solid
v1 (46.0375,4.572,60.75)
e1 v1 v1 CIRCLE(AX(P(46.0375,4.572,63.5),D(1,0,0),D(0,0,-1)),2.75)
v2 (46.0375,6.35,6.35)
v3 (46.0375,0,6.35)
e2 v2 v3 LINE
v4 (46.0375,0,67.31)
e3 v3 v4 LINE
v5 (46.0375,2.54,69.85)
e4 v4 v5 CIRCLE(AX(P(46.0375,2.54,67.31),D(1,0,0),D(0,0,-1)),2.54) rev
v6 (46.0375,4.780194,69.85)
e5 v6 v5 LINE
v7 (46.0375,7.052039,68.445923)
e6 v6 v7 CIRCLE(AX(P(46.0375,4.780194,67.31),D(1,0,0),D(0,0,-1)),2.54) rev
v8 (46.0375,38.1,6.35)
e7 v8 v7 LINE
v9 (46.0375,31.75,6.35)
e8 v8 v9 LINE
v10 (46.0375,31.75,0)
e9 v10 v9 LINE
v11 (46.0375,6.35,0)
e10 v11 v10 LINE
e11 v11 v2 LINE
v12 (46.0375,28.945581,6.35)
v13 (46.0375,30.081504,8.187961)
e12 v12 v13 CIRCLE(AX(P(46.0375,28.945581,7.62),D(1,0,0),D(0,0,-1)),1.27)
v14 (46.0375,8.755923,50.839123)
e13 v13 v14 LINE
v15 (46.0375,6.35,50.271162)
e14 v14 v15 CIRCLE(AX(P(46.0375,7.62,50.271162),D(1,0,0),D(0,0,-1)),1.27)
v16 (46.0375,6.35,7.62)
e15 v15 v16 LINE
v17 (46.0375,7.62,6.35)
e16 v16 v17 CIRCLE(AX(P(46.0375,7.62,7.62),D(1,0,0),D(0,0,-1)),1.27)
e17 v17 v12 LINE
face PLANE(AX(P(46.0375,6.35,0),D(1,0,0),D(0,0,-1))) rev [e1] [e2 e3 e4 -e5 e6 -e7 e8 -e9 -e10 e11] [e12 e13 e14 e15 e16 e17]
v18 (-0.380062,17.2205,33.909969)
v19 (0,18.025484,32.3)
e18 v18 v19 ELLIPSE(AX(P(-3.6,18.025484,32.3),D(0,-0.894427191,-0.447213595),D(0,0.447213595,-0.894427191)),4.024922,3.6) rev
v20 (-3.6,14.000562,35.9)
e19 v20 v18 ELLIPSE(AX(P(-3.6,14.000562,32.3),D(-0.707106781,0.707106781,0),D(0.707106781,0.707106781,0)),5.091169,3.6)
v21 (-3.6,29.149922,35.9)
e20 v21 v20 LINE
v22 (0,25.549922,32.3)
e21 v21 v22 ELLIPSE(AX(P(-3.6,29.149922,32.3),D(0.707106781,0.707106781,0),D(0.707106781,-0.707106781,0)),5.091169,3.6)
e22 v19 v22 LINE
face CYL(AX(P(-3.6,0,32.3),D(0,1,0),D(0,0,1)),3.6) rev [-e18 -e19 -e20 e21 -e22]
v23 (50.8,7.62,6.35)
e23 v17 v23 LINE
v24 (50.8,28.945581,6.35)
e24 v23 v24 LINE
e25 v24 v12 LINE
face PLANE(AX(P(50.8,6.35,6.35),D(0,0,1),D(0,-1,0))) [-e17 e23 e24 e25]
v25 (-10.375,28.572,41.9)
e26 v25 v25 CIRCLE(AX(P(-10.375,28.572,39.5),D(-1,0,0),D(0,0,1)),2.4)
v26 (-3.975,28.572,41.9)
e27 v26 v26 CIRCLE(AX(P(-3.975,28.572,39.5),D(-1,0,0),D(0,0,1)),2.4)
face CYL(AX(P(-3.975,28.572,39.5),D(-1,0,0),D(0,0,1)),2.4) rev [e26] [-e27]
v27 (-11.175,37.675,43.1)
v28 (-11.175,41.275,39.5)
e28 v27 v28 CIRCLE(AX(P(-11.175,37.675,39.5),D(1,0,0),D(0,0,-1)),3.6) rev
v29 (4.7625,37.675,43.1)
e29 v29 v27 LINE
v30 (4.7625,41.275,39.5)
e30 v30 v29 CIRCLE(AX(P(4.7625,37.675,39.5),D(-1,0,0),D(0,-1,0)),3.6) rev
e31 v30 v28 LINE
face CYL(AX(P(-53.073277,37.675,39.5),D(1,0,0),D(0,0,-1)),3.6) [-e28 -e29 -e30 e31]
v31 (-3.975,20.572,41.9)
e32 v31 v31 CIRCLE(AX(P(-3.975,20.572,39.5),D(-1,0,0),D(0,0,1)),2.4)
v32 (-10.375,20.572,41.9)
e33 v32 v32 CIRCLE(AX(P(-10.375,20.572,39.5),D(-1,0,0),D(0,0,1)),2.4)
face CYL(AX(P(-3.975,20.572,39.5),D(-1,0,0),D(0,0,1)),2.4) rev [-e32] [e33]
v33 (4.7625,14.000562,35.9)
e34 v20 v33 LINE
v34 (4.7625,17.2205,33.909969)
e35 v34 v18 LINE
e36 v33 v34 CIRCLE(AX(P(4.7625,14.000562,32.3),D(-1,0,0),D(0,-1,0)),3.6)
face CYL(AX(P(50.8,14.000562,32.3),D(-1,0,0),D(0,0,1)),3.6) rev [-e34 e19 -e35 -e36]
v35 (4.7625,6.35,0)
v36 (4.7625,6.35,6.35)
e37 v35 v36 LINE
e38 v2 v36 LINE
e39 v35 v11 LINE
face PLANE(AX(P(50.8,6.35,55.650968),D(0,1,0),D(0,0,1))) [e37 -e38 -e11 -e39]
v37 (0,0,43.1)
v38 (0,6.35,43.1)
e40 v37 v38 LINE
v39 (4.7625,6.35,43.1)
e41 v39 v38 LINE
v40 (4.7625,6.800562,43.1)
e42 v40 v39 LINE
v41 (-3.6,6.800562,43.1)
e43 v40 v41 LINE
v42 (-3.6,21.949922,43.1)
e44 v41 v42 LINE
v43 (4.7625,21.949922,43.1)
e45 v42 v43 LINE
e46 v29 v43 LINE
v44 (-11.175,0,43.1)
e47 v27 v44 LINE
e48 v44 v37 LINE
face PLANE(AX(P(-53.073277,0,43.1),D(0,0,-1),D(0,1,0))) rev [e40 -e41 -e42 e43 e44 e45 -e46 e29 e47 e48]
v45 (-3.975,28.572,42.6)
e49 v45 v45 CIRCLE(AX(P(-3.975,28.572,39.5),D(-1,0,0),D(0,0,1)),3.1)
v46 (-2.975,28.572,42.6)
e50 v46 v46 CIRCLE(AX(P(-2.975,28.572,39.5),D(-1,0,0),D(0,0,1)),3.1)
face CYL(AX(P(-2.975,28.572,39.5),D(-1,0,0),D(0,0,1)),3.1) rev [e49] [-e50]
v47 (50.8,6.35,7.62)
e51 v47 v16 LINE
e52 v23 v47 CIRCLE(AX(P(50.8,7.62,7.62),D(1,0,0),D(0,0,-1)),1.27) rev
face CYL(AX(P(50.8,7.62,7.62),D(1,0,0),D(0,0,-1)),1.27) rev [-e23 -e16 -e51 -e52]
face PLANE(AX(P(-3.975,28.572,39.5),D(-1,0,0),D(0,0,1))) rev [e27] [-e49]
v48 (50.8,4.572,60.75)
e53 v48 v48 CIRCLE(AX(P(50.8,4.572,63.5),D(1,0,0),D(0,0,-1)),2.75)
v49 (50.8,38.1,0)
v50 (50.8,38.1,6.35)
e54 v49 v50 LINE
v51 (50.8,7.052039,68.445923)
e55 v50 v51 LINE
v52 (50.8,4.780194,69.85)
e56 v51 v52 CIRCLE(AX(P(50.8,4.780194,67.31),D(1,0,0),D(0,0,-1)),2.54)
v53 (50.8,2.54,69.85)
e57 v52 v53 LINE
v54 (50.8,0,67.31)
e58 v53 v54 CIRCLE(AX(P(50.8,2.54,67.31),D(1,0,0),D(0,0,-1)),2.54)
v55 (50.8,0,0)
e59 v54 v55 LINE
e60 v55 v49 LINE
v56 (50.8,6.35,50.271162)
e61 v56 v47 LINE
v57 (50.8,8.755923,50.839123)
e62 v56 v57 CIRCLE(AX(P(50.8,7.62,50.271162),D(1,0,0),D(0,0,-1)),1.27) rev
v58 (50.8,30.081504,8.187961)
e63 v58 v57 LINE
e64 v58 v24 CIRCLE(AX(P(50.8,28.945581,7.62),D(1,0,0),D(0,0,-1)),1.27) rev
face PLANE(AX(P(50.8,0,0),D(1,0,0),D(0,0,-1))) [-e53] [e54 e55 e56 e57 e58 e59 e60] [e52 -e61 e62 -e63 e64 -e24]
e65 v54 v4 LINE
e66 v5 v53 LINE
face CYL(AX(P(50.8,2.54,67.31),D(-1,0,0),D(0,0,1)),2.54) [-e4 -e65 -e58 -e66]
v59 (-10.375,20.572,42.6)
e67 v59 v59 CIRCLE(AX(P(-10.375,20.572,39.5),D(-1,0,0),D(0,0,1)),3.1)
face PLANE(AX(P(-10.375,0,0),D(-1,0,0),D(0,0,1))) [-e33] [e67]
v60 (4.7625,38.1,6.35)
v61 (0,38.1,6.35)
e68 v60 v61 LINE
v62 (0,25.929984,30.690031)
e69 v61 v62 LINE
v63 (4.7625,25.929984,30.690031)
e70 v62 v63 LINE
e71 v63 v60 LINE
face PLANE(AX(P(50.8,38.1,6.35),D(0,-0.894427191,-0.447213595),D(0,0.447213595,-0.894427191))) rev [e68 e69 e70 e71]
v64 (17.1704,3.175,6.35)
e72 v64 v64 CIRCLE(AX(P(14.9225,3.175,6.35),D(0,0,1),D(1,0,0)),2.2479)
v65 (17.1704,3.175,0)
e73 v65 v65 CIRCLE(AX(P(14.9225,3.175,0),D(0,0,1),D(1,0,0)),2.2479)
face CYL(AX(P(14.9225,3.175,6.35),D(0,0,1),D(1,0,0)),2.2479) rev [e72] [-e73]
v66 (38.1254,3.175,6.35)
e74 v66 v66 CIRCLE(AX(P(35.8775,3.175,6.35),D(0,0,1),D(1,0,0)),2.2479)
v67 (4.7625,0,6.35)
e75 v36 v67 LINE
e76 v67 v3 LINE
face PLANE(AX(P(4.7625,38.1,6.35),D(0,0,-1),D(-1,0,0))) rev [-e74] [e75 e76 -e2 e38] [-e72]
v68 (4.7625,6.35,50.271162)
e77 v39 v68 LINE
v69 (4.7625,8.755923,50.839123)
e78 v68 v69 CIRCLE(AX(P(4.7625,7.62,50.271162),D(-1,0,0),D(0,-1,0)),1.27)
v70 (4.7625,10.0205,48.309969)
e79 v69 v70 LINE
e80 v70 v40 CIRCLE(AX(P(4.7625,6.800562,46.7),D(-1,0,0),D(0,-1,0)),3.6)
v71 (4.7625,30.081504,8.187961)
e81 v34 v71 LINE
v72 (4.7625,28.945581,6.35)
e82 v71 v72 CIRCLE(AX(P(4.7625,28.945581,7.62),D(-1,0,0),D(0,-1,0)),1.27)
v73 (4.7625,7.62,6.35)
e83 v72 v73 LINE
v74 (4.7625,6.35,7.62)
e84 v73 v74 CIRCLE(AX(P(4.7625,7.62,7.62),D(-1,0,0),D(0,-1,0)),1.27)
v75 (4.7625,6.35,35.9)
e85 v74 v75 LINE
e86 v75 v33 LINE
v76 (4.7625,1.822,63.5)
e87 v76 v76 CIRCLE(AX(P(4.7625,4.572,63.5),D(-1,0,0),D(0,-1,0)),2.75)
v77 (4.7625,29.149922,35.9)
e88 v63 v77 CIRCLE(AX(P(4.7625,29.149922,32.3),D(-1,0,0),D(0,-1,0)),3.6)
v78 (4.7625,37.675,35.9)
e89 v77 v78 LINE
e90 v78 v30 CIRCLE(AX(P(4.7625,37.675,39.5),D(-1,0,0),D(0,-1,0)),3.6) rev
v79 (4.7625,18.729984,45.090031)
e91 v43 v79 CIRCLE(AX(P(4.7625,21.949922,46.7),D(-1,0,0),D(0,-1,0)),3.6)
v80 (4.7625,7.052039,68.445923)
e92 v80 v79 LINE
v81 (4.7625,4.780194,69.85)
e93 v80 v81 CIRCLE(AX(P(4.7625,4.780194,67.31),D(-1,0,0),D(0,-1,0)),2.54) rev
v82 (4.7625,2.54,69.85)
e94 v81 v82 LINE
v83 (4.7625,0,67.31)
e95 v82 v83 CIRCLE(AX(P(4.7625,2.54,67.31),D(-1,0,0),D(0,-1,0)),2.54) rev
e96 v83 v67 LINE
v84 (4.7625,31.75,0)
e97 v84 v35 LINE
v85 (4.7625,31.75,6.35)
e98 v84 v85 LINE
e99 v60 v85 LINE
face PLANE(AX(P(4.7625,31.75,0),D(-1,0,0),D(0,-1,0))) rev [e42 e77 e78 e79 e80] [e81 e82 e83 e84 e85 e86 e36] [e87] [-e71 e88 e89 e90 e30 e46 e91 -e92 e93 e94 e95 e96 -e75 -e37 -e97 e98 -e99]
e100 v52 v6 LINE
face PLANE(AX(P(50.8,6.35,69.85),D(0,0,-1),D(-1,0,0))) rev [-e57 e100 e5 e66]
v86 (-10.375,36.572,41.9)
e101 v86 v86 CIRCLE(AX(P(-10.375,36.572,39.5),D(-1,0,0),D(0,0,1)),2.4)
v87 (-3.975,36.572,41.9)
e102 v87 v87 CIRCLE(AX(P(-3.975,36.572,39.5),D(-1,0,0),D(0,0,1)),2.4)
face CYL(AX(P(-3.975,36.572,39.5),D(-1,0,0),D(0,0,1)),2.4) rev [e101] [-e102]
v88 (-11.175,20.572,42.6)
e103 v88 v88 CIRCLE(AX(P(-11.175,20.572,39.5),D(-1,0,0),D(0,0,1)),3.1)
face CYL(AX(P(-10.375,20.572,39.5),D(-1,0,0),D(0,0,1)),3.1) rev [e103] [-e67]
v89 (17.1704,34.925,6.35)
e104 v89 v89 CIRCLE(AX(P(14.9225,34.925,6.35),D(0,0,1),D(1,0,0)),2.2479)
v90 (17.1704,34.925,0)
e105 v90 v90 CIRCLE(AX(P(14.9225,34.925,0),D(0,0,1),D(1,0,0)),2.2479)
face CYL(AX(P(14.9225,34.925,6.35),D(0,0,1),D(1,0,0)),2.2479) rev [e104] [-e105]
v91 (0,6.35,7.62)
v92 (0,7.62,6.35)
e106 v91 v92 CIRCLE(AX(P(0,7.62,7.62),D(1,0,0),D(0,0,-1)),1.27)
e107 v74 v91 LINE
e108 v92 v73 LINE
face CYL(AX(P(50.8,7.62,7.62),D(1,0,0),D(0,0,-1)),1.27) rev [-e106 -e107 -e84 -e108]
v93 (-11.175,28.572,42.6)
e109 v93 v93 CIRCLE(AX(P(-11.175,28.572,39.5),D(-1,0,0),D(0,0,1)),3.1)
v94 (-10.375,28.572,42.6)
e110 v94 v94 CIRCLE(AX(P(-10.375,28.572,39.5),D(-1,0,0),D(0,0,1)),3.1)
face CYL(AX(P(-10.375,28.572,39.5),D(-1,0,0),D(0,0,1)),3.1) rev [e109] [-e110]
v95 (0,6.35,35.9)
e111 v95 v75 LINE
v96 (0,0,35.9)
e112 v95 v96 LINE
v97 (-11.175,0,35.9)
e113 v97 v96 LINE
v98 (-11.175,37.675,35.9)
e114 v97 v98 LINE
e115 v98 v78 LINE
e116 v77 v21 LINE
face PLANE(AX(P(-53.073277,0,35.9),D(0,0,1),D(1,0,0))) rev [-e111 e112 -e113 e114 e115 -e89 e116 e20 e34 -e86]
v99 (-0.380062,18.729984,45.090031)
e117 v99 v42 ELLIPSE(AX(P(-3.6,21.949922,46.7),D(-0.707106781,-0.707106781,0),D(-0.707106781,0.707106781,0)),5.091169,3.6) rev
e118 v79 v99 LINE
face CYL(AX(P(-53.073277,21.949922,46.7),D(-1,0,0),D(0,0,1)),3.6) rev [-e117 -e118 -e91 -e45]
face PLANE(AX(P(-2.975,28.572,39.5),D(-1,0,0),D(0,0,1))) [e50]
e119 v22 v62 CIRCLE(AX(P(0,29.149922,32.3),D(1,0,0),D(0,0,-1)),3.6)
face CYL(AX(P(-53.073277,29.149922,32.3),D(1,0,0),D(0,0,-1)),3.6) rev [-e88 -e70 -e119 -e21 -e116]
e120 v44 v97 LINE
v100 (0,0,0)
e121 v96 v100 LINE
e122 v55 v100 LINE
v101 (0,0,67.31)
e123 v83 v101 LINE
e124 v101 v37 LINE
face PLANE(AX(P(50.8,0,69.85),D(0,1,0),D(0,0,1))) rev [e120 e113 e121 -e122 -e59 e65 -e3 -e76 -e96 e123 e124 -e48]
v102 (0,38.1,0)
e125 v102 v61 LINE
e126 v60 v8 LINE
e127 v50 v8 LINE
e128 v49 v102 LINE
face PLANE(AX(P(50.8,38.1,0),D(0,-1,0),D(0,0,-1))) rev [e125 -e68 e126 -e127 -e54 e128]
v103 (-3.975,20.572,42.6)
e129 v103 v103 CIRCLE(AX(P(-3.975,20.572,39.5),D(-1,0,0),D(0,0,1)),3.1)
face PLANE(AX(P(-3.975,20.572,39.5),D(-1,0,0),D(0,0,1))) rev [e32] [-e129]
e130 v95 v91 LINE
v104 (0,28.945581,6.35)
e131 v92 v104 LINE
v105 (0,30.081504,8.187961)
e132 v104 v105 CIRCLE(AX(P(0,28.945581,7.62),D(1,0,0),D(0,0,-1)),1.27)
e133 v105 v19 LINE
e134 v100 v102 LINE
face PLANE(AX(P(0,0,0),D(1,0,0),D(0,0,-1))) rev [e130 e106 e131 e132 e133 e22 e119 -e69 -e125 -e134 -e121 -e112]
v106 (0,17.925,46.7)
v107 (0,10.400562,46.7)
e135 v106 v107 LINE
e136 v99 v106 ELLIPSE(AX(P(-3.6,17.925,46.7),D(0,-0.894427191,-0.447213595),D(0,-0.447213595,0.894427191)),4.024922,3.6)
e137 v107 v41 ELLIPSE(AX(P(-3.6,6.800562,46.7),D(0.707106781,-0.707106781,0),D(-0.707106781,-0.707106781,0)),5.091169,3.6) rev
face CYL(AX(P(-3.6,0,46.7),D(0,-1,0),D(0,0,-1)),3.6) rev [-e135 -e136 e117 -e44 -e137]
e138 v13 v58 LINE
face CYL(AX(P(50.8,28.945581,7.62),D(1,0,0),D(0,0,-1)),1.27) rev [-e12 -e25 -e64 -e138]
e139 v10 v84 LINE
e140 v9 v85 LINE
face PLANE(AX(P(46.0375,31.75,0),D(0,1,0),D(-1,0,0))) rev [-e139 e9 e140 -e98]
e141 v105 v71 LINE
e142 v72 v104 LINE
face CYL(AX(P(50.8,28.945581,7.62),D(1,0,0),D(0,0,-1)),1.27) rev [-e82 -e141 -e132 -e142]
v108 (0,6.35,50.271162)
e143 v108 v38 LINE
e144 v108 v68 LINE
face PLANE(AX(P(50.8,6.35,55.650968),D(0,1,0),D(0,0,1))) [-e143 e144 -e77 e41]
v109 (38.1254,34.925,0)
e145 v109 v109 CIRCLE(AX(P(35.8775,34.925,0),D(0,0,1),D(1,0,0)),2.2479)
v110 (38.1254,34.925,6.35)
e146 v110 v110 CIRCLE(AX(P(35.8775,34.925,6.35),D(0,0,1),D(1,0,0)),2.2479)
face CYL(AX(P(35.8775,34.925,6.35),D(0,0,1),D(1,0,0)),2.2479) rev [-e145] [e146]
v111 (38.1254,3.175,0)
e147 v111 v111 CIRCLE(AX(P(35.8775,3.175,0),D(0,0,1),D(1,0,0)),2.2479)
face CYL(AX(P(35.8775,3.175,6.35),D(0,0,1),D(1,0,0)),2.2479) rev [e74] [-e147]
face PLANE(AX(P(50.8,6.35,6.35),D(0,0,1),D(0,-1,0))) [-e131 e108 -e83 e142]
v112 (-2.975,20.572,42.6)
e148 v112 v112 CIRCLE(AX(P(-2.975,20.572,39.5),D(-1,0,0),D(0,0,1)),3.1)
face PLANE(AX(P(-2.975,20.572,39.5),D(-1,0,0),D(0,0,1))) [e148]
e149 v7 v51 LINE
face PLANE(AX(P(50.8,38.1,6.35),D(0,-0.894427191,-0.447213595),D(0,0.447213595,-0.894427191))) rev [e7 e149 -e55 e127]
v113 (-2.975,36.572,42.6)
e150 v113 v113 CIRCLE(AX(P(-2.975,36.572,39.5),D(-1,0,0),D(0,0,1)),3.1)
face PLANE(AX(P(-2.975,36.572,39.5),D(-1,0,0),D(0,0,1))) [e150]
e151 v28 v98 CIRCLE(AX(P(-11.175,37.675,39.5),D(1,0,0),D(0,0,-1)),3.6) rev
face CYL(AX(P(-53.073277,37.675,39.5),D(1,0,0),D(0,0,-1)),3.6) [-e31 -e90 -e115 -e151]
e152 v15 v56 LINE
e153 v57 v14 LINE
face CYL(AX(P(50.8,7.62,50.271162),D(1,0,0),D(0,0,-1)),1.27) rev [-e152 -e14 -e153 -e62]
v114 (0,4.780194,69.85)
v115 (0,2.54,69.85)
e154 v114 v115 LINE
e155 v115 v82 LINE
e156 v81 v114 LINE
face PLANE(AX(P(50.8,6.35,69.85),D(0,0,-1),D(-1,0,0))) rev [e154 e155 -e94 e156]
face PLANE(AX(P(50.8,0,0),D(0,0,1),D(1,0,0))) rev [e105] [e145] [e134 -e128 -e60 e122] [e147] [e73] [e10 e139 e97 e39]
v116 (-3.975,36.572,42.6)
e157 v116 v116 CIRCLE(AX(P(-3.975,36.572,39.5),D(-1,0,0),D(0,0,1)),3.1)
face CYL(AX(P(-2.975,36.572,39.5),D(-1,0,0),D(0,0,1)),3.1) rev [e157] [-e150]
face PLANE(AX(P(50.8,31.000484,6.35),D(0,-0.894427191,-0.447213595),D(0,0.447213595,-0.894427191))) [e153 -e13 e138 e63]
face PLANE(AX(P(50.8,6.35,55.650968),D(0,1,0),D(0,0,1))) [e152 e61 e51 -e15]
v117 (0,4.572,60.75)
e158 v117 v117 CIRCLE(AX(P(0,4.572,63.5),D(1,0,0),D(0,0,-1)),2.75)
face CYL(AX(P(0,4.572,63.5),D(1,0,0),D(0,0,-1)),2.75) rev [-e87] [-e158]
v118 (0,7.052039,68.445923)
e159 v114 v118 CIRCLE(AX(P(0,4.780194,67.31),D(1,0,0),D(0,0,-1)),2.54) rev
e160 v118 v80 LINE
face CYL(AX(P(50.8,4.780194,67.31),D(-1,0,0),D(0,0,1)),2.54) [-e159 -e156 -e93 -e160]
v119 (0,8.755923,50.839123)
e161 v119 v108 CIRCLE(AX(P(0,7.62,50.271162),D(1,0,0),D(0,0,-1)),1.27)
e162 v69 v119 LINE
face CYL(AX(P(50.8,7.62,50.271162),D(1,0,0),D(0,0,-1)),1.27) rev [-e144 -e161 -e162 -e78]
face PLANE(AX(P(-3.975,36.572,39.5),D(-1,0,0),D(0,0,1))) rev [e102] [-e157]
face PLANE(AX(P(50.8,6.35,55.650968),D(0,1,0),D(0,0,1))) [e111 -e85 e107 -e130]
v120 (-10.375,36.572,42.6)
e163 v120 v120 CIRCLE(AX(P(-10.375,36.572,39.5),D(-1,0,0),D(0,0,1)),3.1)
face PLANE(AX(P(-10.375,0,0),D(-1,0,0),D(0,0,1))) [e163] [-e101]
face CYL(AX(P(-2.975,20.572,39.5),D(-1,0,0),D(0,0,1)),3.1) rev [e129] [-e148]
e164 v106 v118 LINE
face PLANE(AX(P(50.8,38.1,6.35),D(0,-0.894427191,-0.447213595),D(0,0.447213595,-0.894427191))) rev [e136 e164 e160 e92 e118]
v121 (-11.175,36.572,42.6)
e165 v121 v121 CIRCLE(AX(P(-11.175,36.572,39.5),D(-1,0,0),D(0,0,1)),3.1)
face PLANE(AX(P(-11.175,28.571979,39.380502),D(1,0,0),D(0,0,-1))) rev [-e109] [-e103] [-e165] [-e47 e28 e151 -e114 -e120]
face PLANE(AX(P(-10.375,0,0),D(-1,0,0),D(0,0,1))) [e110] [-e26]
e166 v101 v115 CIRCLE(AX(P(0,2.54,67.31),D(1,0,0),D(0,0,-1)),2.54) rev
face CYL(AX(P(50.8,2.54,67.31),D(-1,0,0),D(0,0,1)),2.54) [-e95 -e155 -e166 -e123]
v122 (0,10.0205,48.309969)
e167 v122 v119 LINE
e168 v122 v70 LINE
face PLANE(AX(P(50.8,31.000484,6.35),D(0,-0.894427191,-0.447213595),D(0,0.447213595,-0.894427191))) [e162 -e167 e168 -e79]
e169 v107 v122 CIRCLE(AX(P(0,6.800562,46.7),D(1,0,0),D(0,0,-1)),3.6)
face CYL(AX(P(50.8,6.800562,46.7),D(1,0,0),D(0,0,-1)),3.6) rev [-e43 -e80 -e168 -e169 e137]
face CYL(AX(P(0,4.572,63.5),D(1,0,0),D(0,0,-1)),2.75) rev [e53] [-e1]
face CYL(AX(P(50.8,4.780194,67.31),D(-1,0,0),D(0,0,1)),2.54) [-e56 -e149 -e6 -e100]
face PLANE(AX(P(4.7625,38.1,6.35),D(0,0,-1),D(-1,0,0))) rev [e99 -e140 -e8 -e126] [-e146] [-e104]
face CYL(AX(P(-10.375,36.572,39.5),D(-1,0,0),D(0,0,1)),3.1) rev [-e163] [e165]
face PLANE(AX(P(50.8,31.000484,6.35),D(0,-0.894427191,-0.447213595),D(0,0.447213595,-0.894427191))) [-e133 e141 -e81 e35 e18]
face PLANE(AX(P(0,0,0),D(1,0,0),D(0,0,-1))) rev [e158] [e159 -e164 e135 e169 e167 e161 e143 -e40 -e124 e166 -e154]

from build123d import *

# Parameters (mm, degrees)
BOSS_EXTRUDE1_DEPTH   = 50.8
SKETCH2_W             = 41.275
SKETCH2_H             = 25.4
CUT_EXTRUDE1_DEPTH    = 95.399536545
SKETCH3_W             = 41.275
SKETCH3_H             = 63.5
CUT_EXTRUDE2_DEPTH    = 95.399536545
SKETCH4_R             = 2.75
CUT_EXTRUDE3_DEPTH    = 95.399536545
FILLET1_R             = 2.54
FILLET3_DEPTH         = 4.7625
FILLET3_START         = 46.0375
FILLET3_2_DEPTH       = 4.7625
F_8_CLEARANCE_HOLE1_D = 4.4958
BOSS_EXTRUDE2_START   = -4.7625
SKETCH9_W             = 7.2
SKETCH9_H             = 41.275
BOSS_EXTRUDE2_DEPTH   = 15.9375
SKETCH10_R            = 3.1
CUT_EXTRUDE4_DEPTH    = 0.8
SKETCH10_3_R          = 2.4
CUT_EXTRUDE5_DEPTH    = 7.2
CUT_EXTRUDE9_START    = -7.2
SKETCH10_4_R          = 3.1
SKETCH10_4_R_2        = 2.4
CUT_EXTRUDE9_DEPTH    = 1
FILLET4_R             = 3.6


with BuildPart() as part:
    # Sketch1 → Boss-Extrude1 (new body)
    with BuildSketch(Plane(origin=(0, 0, 0), x_dir=(0, 0, -1), z_dir=(1, 0, 0))):
        Polygon((0, 0), (0, 38.1), (-6.35, 38.1), (-69.85, 6.35), (-69.85, 0), align=None)
        Polygon((-55.650968343, 6.35), (-6.35, 6.35), (-6.35, 31.000484171), align=None, mode=Mode.SUBTRACT)
    extrude(amount=BOSS_EXTRUDE1_DEPTH)

    # Sketch2 → Cut-Extrude1 (cut, through all)
    with BuildSketch(Plane.XY.offset(69.85)):
        with Locations((25.4, 19.05)):
            Rectangle(SKETCH2_W, SKETCH2_H)
    extrude(amount=-CUT_EXTRUDE1_DEPTH, mode=Mode.SUBTRACT)

    # Sketch3 → Cut-Extrude2 (cut, through all)
    with BuildSketch(Plane.XZ):
        with Locations((25.4, 38.1)):
            Rectangle(SKETCH3_W, SKETCH3_H)
    extrude(amount=-CUT_EXTRUDE2_DEPTH, mode=Mode.SUBTRACT)

    # Sketch4 → Cut-Extrude3 (cut, through all)
    with BuildSketch(Plane(origin=(50.8, 0, 0), x_dir=(0, 0, -1), z_dir=(1, 0, 0))):
        with Locations((-63.5, 4.572)):
            Circle(SKETCH4_R)
    extrude(amount=-CUT_EXTRUDE3_DEPTH, mode=Mode.SUBTRACT)

    # Fillet1
    fillet1_edges = [part.edges().sort_by_distance(p)[0] for p in [
        (2.38125, 6.35, 69.85),
        (2.38125, 0, 69.85),
        (48.41875, 0, 69.85),
        (48.41875, 6.35, 69.85),
    ]]
    fillet(fillet1_edges, radius=FILLET1_R)

    # Fillet3: read off the stored shape, not the designer's step
    # Fillet3 outline → Fillet3 (add)
    with BuildSketch(Plane.YZ):
        with BuildLine():
            ThreePointArc((7.62, 6.35), (6.721974388, 6.721974388), (6.35, 7.62))
            Line((6.35, 7.62), (6.35, 6.35))
            Line((6.35, 6.35), (7.62, 6.35))
        make_face()
        with BuildLine():
            Line((6.35, 55.650968343), (6.35, 50.271162011))
            ThreePointArc((6.35, 50.271162011), (7.328213791, 51.507188228), (8.755922533, 50.839123278))
            Line((8.755922533, 50.839123278), (6.35, 55.650968343))
        make_face()
        with BuildLine():
            ThreePointArc((30.081503538, 8.187961266), (30.025907532, 6.952321488), (28.945581006, 6.35))
            Line((28.945581006, 6.35), (31.000484171, 6.35))
            Line((31.000484171, 6.35), (30.081503538, 8.187961266))
        make_face()
    extrude(amount=FILLET3_DEPTH)

    # Fillet3 2 outline → Fillet3 2 (add)
    with BuildSketch(Plane.YZ.offset(FILLET3_START)):
        with BuildLine():
            ThreePointArc((7.62, 6.35), (6.721974388, 6.721974388), (6.35, 7.62))
            Line((6.35, 7.62), (6.35, 6.35))
            Line((6.35, 6.35), (7.62, 6.35))
        make_face()
        with BuildLine():
            Line((6.35, 55.650968343), (6.35, 50.271162011))
            ThreePointArc((6.35, 50.271162011), (7.328213791, 51.507188228), (8.755922533, 50.839123278))
            Line((8.755922533, 50.839123278), (6.35, 55.650968343))
        make_face()
        with BuildLine():
            ThreePointArc((30.081503538, 8.187961266), (30.025907532, 6.952321488), (28.945581006, 6.35))
            Line((28.945581006, 6.35), (31.000484171, 6.35))
            Line((31.000484171, 6.35), (30.081503538, 8.187961266))
        make_face()
    extrude(amount=FILLET3_2_DEPTH)

    # #8 Clearance Hole1 (through all)
    with Locations(Plane.XY.offset(6.35)):
        with Locations((14.9225, 34.925), (35.8775, 34.925), (14.9225, 3.175), (35.8775, 3.175)):
            Hole(F_8_CLEARANCE_HOLE1_D / 2)

    # Sketch9 → Boss-Extrude2 (add)
    with BuildSketch(Plane.ZY.offset(BOSS_EXTRUDE2_START)):
        with Locations((39.5, 20.6375)):
            Rectangle(SKETCH9_W, SKETCH9_H)
    extrude(amount=BOSS_EXTRUDE2_DEPTH)

    # Sketch10 → Cut-Extrude4 (cut)
    with BuildSketch(Plane.ZY.offset(11.175)):
        with Locations((39.5, 36.572)):
            Circle(SKETCH10_R)
        with Locations((39.5, 28.572)):
            Circle(SKETCH10_R)
        with Locations((39.5, 20.572)):
            Circle(SKETCH10_R)
    extrude(amount=-CUT_EXTRUDE4_DEPTH, mode=Mode.SUBTRACT)

    # Sketch10<3> → Cut-Extrude5 (cut)
    with BuildSketch(Plane.ZY.offset(11.175)):
        with Locations((39.5, 20.572)):
            Circle(SKETCH10_3_R)
        with Locations((39.5, 36.572)):
            Circle(SKETCH10_3_R)
        with Locations((39.5, 28.572)):
            Circle(SKETCH10_3_R)
    extrude(amount=-CUT_EXTRUDE5_DEPTH, mode=Mode.SUBTRACT)

    # Sketch10<4> → Cut-Extrude9 (cut)
    # profile 1 of 5: a face of its own
    with BuildSketch(Plane.ZY.offset(11.175).offset(CUT_EXTRUDE9_START)):
        with Locations((39.5, 28.572)):
            Circle(SKETCH10_4_R)
        with Locations((39.5, 28.572)):
            Circle(SKETCH10_4_R_2, mode=Mode.SUBTRACT)
    # profile 2 of 5: a face of its own
    with BuildSketch(Plane.ZY.offset(11.175).offset(CUT_EXTRUDE9_START)):
        with Locations((39.5, 28.572)):
            Circle(SKETCH10_4_R_2)
    # profile 3 of 5: a face of its own
    with BuildSketch(Plane.ZY.offset(11.175).offset(CUT_EXTRUDE9_START)):
        with Locations((39.5, 20.572)):
            Circle(SKETCH10_4_R)
        with Locations((39.5, 20.572)):
            Circle(SKETCH10_4_R_2, mode=Mode.SUBTRACT)
    # profile 4 of 5: a face of its own
    with BuildSketch(Plane.ZY.offset(11.175).offset(CUT_EXTRUDE9_START)):
        with Locations((39.5, 20.572)):
            Circle(SKETCH10_4_R_2)
    # profile 5 of 5: a face of its own
    with BuildSketch(Plane.ZY.offset(11.175).offset(CUT_EXTRUDE9_START)):
        with Locations((39.5, 36.572)):
            Circle(SKETCH10_4_R)
    extrude(amount=-CUT_EXTRUDE9_DEPTH, mode=Mode.SUBTRACT)

    # Fillet4
    fillet4_edges = [part.edges().sort_by_distance(p)[0] for p in [
        (-3.20625, 41.275, 43.1),
        (-3.20625, 41.275, 35.9),
        (2.38125, 12.625484171, 43.1),
        (0, 16.175242086, 43.1),
        (2.38125, 19.725, 43.1),
        (2.38125, 16.225484171, 35.9),
        (0, 19.775242086, 35.9),
        (2.38125, 23.325, 35.9),
    ]]
    fillet(fillet4_edges, radius=FILLET4_R - 0.0001)  # a hair under: the kernel refuses the full size


solid = part.part
